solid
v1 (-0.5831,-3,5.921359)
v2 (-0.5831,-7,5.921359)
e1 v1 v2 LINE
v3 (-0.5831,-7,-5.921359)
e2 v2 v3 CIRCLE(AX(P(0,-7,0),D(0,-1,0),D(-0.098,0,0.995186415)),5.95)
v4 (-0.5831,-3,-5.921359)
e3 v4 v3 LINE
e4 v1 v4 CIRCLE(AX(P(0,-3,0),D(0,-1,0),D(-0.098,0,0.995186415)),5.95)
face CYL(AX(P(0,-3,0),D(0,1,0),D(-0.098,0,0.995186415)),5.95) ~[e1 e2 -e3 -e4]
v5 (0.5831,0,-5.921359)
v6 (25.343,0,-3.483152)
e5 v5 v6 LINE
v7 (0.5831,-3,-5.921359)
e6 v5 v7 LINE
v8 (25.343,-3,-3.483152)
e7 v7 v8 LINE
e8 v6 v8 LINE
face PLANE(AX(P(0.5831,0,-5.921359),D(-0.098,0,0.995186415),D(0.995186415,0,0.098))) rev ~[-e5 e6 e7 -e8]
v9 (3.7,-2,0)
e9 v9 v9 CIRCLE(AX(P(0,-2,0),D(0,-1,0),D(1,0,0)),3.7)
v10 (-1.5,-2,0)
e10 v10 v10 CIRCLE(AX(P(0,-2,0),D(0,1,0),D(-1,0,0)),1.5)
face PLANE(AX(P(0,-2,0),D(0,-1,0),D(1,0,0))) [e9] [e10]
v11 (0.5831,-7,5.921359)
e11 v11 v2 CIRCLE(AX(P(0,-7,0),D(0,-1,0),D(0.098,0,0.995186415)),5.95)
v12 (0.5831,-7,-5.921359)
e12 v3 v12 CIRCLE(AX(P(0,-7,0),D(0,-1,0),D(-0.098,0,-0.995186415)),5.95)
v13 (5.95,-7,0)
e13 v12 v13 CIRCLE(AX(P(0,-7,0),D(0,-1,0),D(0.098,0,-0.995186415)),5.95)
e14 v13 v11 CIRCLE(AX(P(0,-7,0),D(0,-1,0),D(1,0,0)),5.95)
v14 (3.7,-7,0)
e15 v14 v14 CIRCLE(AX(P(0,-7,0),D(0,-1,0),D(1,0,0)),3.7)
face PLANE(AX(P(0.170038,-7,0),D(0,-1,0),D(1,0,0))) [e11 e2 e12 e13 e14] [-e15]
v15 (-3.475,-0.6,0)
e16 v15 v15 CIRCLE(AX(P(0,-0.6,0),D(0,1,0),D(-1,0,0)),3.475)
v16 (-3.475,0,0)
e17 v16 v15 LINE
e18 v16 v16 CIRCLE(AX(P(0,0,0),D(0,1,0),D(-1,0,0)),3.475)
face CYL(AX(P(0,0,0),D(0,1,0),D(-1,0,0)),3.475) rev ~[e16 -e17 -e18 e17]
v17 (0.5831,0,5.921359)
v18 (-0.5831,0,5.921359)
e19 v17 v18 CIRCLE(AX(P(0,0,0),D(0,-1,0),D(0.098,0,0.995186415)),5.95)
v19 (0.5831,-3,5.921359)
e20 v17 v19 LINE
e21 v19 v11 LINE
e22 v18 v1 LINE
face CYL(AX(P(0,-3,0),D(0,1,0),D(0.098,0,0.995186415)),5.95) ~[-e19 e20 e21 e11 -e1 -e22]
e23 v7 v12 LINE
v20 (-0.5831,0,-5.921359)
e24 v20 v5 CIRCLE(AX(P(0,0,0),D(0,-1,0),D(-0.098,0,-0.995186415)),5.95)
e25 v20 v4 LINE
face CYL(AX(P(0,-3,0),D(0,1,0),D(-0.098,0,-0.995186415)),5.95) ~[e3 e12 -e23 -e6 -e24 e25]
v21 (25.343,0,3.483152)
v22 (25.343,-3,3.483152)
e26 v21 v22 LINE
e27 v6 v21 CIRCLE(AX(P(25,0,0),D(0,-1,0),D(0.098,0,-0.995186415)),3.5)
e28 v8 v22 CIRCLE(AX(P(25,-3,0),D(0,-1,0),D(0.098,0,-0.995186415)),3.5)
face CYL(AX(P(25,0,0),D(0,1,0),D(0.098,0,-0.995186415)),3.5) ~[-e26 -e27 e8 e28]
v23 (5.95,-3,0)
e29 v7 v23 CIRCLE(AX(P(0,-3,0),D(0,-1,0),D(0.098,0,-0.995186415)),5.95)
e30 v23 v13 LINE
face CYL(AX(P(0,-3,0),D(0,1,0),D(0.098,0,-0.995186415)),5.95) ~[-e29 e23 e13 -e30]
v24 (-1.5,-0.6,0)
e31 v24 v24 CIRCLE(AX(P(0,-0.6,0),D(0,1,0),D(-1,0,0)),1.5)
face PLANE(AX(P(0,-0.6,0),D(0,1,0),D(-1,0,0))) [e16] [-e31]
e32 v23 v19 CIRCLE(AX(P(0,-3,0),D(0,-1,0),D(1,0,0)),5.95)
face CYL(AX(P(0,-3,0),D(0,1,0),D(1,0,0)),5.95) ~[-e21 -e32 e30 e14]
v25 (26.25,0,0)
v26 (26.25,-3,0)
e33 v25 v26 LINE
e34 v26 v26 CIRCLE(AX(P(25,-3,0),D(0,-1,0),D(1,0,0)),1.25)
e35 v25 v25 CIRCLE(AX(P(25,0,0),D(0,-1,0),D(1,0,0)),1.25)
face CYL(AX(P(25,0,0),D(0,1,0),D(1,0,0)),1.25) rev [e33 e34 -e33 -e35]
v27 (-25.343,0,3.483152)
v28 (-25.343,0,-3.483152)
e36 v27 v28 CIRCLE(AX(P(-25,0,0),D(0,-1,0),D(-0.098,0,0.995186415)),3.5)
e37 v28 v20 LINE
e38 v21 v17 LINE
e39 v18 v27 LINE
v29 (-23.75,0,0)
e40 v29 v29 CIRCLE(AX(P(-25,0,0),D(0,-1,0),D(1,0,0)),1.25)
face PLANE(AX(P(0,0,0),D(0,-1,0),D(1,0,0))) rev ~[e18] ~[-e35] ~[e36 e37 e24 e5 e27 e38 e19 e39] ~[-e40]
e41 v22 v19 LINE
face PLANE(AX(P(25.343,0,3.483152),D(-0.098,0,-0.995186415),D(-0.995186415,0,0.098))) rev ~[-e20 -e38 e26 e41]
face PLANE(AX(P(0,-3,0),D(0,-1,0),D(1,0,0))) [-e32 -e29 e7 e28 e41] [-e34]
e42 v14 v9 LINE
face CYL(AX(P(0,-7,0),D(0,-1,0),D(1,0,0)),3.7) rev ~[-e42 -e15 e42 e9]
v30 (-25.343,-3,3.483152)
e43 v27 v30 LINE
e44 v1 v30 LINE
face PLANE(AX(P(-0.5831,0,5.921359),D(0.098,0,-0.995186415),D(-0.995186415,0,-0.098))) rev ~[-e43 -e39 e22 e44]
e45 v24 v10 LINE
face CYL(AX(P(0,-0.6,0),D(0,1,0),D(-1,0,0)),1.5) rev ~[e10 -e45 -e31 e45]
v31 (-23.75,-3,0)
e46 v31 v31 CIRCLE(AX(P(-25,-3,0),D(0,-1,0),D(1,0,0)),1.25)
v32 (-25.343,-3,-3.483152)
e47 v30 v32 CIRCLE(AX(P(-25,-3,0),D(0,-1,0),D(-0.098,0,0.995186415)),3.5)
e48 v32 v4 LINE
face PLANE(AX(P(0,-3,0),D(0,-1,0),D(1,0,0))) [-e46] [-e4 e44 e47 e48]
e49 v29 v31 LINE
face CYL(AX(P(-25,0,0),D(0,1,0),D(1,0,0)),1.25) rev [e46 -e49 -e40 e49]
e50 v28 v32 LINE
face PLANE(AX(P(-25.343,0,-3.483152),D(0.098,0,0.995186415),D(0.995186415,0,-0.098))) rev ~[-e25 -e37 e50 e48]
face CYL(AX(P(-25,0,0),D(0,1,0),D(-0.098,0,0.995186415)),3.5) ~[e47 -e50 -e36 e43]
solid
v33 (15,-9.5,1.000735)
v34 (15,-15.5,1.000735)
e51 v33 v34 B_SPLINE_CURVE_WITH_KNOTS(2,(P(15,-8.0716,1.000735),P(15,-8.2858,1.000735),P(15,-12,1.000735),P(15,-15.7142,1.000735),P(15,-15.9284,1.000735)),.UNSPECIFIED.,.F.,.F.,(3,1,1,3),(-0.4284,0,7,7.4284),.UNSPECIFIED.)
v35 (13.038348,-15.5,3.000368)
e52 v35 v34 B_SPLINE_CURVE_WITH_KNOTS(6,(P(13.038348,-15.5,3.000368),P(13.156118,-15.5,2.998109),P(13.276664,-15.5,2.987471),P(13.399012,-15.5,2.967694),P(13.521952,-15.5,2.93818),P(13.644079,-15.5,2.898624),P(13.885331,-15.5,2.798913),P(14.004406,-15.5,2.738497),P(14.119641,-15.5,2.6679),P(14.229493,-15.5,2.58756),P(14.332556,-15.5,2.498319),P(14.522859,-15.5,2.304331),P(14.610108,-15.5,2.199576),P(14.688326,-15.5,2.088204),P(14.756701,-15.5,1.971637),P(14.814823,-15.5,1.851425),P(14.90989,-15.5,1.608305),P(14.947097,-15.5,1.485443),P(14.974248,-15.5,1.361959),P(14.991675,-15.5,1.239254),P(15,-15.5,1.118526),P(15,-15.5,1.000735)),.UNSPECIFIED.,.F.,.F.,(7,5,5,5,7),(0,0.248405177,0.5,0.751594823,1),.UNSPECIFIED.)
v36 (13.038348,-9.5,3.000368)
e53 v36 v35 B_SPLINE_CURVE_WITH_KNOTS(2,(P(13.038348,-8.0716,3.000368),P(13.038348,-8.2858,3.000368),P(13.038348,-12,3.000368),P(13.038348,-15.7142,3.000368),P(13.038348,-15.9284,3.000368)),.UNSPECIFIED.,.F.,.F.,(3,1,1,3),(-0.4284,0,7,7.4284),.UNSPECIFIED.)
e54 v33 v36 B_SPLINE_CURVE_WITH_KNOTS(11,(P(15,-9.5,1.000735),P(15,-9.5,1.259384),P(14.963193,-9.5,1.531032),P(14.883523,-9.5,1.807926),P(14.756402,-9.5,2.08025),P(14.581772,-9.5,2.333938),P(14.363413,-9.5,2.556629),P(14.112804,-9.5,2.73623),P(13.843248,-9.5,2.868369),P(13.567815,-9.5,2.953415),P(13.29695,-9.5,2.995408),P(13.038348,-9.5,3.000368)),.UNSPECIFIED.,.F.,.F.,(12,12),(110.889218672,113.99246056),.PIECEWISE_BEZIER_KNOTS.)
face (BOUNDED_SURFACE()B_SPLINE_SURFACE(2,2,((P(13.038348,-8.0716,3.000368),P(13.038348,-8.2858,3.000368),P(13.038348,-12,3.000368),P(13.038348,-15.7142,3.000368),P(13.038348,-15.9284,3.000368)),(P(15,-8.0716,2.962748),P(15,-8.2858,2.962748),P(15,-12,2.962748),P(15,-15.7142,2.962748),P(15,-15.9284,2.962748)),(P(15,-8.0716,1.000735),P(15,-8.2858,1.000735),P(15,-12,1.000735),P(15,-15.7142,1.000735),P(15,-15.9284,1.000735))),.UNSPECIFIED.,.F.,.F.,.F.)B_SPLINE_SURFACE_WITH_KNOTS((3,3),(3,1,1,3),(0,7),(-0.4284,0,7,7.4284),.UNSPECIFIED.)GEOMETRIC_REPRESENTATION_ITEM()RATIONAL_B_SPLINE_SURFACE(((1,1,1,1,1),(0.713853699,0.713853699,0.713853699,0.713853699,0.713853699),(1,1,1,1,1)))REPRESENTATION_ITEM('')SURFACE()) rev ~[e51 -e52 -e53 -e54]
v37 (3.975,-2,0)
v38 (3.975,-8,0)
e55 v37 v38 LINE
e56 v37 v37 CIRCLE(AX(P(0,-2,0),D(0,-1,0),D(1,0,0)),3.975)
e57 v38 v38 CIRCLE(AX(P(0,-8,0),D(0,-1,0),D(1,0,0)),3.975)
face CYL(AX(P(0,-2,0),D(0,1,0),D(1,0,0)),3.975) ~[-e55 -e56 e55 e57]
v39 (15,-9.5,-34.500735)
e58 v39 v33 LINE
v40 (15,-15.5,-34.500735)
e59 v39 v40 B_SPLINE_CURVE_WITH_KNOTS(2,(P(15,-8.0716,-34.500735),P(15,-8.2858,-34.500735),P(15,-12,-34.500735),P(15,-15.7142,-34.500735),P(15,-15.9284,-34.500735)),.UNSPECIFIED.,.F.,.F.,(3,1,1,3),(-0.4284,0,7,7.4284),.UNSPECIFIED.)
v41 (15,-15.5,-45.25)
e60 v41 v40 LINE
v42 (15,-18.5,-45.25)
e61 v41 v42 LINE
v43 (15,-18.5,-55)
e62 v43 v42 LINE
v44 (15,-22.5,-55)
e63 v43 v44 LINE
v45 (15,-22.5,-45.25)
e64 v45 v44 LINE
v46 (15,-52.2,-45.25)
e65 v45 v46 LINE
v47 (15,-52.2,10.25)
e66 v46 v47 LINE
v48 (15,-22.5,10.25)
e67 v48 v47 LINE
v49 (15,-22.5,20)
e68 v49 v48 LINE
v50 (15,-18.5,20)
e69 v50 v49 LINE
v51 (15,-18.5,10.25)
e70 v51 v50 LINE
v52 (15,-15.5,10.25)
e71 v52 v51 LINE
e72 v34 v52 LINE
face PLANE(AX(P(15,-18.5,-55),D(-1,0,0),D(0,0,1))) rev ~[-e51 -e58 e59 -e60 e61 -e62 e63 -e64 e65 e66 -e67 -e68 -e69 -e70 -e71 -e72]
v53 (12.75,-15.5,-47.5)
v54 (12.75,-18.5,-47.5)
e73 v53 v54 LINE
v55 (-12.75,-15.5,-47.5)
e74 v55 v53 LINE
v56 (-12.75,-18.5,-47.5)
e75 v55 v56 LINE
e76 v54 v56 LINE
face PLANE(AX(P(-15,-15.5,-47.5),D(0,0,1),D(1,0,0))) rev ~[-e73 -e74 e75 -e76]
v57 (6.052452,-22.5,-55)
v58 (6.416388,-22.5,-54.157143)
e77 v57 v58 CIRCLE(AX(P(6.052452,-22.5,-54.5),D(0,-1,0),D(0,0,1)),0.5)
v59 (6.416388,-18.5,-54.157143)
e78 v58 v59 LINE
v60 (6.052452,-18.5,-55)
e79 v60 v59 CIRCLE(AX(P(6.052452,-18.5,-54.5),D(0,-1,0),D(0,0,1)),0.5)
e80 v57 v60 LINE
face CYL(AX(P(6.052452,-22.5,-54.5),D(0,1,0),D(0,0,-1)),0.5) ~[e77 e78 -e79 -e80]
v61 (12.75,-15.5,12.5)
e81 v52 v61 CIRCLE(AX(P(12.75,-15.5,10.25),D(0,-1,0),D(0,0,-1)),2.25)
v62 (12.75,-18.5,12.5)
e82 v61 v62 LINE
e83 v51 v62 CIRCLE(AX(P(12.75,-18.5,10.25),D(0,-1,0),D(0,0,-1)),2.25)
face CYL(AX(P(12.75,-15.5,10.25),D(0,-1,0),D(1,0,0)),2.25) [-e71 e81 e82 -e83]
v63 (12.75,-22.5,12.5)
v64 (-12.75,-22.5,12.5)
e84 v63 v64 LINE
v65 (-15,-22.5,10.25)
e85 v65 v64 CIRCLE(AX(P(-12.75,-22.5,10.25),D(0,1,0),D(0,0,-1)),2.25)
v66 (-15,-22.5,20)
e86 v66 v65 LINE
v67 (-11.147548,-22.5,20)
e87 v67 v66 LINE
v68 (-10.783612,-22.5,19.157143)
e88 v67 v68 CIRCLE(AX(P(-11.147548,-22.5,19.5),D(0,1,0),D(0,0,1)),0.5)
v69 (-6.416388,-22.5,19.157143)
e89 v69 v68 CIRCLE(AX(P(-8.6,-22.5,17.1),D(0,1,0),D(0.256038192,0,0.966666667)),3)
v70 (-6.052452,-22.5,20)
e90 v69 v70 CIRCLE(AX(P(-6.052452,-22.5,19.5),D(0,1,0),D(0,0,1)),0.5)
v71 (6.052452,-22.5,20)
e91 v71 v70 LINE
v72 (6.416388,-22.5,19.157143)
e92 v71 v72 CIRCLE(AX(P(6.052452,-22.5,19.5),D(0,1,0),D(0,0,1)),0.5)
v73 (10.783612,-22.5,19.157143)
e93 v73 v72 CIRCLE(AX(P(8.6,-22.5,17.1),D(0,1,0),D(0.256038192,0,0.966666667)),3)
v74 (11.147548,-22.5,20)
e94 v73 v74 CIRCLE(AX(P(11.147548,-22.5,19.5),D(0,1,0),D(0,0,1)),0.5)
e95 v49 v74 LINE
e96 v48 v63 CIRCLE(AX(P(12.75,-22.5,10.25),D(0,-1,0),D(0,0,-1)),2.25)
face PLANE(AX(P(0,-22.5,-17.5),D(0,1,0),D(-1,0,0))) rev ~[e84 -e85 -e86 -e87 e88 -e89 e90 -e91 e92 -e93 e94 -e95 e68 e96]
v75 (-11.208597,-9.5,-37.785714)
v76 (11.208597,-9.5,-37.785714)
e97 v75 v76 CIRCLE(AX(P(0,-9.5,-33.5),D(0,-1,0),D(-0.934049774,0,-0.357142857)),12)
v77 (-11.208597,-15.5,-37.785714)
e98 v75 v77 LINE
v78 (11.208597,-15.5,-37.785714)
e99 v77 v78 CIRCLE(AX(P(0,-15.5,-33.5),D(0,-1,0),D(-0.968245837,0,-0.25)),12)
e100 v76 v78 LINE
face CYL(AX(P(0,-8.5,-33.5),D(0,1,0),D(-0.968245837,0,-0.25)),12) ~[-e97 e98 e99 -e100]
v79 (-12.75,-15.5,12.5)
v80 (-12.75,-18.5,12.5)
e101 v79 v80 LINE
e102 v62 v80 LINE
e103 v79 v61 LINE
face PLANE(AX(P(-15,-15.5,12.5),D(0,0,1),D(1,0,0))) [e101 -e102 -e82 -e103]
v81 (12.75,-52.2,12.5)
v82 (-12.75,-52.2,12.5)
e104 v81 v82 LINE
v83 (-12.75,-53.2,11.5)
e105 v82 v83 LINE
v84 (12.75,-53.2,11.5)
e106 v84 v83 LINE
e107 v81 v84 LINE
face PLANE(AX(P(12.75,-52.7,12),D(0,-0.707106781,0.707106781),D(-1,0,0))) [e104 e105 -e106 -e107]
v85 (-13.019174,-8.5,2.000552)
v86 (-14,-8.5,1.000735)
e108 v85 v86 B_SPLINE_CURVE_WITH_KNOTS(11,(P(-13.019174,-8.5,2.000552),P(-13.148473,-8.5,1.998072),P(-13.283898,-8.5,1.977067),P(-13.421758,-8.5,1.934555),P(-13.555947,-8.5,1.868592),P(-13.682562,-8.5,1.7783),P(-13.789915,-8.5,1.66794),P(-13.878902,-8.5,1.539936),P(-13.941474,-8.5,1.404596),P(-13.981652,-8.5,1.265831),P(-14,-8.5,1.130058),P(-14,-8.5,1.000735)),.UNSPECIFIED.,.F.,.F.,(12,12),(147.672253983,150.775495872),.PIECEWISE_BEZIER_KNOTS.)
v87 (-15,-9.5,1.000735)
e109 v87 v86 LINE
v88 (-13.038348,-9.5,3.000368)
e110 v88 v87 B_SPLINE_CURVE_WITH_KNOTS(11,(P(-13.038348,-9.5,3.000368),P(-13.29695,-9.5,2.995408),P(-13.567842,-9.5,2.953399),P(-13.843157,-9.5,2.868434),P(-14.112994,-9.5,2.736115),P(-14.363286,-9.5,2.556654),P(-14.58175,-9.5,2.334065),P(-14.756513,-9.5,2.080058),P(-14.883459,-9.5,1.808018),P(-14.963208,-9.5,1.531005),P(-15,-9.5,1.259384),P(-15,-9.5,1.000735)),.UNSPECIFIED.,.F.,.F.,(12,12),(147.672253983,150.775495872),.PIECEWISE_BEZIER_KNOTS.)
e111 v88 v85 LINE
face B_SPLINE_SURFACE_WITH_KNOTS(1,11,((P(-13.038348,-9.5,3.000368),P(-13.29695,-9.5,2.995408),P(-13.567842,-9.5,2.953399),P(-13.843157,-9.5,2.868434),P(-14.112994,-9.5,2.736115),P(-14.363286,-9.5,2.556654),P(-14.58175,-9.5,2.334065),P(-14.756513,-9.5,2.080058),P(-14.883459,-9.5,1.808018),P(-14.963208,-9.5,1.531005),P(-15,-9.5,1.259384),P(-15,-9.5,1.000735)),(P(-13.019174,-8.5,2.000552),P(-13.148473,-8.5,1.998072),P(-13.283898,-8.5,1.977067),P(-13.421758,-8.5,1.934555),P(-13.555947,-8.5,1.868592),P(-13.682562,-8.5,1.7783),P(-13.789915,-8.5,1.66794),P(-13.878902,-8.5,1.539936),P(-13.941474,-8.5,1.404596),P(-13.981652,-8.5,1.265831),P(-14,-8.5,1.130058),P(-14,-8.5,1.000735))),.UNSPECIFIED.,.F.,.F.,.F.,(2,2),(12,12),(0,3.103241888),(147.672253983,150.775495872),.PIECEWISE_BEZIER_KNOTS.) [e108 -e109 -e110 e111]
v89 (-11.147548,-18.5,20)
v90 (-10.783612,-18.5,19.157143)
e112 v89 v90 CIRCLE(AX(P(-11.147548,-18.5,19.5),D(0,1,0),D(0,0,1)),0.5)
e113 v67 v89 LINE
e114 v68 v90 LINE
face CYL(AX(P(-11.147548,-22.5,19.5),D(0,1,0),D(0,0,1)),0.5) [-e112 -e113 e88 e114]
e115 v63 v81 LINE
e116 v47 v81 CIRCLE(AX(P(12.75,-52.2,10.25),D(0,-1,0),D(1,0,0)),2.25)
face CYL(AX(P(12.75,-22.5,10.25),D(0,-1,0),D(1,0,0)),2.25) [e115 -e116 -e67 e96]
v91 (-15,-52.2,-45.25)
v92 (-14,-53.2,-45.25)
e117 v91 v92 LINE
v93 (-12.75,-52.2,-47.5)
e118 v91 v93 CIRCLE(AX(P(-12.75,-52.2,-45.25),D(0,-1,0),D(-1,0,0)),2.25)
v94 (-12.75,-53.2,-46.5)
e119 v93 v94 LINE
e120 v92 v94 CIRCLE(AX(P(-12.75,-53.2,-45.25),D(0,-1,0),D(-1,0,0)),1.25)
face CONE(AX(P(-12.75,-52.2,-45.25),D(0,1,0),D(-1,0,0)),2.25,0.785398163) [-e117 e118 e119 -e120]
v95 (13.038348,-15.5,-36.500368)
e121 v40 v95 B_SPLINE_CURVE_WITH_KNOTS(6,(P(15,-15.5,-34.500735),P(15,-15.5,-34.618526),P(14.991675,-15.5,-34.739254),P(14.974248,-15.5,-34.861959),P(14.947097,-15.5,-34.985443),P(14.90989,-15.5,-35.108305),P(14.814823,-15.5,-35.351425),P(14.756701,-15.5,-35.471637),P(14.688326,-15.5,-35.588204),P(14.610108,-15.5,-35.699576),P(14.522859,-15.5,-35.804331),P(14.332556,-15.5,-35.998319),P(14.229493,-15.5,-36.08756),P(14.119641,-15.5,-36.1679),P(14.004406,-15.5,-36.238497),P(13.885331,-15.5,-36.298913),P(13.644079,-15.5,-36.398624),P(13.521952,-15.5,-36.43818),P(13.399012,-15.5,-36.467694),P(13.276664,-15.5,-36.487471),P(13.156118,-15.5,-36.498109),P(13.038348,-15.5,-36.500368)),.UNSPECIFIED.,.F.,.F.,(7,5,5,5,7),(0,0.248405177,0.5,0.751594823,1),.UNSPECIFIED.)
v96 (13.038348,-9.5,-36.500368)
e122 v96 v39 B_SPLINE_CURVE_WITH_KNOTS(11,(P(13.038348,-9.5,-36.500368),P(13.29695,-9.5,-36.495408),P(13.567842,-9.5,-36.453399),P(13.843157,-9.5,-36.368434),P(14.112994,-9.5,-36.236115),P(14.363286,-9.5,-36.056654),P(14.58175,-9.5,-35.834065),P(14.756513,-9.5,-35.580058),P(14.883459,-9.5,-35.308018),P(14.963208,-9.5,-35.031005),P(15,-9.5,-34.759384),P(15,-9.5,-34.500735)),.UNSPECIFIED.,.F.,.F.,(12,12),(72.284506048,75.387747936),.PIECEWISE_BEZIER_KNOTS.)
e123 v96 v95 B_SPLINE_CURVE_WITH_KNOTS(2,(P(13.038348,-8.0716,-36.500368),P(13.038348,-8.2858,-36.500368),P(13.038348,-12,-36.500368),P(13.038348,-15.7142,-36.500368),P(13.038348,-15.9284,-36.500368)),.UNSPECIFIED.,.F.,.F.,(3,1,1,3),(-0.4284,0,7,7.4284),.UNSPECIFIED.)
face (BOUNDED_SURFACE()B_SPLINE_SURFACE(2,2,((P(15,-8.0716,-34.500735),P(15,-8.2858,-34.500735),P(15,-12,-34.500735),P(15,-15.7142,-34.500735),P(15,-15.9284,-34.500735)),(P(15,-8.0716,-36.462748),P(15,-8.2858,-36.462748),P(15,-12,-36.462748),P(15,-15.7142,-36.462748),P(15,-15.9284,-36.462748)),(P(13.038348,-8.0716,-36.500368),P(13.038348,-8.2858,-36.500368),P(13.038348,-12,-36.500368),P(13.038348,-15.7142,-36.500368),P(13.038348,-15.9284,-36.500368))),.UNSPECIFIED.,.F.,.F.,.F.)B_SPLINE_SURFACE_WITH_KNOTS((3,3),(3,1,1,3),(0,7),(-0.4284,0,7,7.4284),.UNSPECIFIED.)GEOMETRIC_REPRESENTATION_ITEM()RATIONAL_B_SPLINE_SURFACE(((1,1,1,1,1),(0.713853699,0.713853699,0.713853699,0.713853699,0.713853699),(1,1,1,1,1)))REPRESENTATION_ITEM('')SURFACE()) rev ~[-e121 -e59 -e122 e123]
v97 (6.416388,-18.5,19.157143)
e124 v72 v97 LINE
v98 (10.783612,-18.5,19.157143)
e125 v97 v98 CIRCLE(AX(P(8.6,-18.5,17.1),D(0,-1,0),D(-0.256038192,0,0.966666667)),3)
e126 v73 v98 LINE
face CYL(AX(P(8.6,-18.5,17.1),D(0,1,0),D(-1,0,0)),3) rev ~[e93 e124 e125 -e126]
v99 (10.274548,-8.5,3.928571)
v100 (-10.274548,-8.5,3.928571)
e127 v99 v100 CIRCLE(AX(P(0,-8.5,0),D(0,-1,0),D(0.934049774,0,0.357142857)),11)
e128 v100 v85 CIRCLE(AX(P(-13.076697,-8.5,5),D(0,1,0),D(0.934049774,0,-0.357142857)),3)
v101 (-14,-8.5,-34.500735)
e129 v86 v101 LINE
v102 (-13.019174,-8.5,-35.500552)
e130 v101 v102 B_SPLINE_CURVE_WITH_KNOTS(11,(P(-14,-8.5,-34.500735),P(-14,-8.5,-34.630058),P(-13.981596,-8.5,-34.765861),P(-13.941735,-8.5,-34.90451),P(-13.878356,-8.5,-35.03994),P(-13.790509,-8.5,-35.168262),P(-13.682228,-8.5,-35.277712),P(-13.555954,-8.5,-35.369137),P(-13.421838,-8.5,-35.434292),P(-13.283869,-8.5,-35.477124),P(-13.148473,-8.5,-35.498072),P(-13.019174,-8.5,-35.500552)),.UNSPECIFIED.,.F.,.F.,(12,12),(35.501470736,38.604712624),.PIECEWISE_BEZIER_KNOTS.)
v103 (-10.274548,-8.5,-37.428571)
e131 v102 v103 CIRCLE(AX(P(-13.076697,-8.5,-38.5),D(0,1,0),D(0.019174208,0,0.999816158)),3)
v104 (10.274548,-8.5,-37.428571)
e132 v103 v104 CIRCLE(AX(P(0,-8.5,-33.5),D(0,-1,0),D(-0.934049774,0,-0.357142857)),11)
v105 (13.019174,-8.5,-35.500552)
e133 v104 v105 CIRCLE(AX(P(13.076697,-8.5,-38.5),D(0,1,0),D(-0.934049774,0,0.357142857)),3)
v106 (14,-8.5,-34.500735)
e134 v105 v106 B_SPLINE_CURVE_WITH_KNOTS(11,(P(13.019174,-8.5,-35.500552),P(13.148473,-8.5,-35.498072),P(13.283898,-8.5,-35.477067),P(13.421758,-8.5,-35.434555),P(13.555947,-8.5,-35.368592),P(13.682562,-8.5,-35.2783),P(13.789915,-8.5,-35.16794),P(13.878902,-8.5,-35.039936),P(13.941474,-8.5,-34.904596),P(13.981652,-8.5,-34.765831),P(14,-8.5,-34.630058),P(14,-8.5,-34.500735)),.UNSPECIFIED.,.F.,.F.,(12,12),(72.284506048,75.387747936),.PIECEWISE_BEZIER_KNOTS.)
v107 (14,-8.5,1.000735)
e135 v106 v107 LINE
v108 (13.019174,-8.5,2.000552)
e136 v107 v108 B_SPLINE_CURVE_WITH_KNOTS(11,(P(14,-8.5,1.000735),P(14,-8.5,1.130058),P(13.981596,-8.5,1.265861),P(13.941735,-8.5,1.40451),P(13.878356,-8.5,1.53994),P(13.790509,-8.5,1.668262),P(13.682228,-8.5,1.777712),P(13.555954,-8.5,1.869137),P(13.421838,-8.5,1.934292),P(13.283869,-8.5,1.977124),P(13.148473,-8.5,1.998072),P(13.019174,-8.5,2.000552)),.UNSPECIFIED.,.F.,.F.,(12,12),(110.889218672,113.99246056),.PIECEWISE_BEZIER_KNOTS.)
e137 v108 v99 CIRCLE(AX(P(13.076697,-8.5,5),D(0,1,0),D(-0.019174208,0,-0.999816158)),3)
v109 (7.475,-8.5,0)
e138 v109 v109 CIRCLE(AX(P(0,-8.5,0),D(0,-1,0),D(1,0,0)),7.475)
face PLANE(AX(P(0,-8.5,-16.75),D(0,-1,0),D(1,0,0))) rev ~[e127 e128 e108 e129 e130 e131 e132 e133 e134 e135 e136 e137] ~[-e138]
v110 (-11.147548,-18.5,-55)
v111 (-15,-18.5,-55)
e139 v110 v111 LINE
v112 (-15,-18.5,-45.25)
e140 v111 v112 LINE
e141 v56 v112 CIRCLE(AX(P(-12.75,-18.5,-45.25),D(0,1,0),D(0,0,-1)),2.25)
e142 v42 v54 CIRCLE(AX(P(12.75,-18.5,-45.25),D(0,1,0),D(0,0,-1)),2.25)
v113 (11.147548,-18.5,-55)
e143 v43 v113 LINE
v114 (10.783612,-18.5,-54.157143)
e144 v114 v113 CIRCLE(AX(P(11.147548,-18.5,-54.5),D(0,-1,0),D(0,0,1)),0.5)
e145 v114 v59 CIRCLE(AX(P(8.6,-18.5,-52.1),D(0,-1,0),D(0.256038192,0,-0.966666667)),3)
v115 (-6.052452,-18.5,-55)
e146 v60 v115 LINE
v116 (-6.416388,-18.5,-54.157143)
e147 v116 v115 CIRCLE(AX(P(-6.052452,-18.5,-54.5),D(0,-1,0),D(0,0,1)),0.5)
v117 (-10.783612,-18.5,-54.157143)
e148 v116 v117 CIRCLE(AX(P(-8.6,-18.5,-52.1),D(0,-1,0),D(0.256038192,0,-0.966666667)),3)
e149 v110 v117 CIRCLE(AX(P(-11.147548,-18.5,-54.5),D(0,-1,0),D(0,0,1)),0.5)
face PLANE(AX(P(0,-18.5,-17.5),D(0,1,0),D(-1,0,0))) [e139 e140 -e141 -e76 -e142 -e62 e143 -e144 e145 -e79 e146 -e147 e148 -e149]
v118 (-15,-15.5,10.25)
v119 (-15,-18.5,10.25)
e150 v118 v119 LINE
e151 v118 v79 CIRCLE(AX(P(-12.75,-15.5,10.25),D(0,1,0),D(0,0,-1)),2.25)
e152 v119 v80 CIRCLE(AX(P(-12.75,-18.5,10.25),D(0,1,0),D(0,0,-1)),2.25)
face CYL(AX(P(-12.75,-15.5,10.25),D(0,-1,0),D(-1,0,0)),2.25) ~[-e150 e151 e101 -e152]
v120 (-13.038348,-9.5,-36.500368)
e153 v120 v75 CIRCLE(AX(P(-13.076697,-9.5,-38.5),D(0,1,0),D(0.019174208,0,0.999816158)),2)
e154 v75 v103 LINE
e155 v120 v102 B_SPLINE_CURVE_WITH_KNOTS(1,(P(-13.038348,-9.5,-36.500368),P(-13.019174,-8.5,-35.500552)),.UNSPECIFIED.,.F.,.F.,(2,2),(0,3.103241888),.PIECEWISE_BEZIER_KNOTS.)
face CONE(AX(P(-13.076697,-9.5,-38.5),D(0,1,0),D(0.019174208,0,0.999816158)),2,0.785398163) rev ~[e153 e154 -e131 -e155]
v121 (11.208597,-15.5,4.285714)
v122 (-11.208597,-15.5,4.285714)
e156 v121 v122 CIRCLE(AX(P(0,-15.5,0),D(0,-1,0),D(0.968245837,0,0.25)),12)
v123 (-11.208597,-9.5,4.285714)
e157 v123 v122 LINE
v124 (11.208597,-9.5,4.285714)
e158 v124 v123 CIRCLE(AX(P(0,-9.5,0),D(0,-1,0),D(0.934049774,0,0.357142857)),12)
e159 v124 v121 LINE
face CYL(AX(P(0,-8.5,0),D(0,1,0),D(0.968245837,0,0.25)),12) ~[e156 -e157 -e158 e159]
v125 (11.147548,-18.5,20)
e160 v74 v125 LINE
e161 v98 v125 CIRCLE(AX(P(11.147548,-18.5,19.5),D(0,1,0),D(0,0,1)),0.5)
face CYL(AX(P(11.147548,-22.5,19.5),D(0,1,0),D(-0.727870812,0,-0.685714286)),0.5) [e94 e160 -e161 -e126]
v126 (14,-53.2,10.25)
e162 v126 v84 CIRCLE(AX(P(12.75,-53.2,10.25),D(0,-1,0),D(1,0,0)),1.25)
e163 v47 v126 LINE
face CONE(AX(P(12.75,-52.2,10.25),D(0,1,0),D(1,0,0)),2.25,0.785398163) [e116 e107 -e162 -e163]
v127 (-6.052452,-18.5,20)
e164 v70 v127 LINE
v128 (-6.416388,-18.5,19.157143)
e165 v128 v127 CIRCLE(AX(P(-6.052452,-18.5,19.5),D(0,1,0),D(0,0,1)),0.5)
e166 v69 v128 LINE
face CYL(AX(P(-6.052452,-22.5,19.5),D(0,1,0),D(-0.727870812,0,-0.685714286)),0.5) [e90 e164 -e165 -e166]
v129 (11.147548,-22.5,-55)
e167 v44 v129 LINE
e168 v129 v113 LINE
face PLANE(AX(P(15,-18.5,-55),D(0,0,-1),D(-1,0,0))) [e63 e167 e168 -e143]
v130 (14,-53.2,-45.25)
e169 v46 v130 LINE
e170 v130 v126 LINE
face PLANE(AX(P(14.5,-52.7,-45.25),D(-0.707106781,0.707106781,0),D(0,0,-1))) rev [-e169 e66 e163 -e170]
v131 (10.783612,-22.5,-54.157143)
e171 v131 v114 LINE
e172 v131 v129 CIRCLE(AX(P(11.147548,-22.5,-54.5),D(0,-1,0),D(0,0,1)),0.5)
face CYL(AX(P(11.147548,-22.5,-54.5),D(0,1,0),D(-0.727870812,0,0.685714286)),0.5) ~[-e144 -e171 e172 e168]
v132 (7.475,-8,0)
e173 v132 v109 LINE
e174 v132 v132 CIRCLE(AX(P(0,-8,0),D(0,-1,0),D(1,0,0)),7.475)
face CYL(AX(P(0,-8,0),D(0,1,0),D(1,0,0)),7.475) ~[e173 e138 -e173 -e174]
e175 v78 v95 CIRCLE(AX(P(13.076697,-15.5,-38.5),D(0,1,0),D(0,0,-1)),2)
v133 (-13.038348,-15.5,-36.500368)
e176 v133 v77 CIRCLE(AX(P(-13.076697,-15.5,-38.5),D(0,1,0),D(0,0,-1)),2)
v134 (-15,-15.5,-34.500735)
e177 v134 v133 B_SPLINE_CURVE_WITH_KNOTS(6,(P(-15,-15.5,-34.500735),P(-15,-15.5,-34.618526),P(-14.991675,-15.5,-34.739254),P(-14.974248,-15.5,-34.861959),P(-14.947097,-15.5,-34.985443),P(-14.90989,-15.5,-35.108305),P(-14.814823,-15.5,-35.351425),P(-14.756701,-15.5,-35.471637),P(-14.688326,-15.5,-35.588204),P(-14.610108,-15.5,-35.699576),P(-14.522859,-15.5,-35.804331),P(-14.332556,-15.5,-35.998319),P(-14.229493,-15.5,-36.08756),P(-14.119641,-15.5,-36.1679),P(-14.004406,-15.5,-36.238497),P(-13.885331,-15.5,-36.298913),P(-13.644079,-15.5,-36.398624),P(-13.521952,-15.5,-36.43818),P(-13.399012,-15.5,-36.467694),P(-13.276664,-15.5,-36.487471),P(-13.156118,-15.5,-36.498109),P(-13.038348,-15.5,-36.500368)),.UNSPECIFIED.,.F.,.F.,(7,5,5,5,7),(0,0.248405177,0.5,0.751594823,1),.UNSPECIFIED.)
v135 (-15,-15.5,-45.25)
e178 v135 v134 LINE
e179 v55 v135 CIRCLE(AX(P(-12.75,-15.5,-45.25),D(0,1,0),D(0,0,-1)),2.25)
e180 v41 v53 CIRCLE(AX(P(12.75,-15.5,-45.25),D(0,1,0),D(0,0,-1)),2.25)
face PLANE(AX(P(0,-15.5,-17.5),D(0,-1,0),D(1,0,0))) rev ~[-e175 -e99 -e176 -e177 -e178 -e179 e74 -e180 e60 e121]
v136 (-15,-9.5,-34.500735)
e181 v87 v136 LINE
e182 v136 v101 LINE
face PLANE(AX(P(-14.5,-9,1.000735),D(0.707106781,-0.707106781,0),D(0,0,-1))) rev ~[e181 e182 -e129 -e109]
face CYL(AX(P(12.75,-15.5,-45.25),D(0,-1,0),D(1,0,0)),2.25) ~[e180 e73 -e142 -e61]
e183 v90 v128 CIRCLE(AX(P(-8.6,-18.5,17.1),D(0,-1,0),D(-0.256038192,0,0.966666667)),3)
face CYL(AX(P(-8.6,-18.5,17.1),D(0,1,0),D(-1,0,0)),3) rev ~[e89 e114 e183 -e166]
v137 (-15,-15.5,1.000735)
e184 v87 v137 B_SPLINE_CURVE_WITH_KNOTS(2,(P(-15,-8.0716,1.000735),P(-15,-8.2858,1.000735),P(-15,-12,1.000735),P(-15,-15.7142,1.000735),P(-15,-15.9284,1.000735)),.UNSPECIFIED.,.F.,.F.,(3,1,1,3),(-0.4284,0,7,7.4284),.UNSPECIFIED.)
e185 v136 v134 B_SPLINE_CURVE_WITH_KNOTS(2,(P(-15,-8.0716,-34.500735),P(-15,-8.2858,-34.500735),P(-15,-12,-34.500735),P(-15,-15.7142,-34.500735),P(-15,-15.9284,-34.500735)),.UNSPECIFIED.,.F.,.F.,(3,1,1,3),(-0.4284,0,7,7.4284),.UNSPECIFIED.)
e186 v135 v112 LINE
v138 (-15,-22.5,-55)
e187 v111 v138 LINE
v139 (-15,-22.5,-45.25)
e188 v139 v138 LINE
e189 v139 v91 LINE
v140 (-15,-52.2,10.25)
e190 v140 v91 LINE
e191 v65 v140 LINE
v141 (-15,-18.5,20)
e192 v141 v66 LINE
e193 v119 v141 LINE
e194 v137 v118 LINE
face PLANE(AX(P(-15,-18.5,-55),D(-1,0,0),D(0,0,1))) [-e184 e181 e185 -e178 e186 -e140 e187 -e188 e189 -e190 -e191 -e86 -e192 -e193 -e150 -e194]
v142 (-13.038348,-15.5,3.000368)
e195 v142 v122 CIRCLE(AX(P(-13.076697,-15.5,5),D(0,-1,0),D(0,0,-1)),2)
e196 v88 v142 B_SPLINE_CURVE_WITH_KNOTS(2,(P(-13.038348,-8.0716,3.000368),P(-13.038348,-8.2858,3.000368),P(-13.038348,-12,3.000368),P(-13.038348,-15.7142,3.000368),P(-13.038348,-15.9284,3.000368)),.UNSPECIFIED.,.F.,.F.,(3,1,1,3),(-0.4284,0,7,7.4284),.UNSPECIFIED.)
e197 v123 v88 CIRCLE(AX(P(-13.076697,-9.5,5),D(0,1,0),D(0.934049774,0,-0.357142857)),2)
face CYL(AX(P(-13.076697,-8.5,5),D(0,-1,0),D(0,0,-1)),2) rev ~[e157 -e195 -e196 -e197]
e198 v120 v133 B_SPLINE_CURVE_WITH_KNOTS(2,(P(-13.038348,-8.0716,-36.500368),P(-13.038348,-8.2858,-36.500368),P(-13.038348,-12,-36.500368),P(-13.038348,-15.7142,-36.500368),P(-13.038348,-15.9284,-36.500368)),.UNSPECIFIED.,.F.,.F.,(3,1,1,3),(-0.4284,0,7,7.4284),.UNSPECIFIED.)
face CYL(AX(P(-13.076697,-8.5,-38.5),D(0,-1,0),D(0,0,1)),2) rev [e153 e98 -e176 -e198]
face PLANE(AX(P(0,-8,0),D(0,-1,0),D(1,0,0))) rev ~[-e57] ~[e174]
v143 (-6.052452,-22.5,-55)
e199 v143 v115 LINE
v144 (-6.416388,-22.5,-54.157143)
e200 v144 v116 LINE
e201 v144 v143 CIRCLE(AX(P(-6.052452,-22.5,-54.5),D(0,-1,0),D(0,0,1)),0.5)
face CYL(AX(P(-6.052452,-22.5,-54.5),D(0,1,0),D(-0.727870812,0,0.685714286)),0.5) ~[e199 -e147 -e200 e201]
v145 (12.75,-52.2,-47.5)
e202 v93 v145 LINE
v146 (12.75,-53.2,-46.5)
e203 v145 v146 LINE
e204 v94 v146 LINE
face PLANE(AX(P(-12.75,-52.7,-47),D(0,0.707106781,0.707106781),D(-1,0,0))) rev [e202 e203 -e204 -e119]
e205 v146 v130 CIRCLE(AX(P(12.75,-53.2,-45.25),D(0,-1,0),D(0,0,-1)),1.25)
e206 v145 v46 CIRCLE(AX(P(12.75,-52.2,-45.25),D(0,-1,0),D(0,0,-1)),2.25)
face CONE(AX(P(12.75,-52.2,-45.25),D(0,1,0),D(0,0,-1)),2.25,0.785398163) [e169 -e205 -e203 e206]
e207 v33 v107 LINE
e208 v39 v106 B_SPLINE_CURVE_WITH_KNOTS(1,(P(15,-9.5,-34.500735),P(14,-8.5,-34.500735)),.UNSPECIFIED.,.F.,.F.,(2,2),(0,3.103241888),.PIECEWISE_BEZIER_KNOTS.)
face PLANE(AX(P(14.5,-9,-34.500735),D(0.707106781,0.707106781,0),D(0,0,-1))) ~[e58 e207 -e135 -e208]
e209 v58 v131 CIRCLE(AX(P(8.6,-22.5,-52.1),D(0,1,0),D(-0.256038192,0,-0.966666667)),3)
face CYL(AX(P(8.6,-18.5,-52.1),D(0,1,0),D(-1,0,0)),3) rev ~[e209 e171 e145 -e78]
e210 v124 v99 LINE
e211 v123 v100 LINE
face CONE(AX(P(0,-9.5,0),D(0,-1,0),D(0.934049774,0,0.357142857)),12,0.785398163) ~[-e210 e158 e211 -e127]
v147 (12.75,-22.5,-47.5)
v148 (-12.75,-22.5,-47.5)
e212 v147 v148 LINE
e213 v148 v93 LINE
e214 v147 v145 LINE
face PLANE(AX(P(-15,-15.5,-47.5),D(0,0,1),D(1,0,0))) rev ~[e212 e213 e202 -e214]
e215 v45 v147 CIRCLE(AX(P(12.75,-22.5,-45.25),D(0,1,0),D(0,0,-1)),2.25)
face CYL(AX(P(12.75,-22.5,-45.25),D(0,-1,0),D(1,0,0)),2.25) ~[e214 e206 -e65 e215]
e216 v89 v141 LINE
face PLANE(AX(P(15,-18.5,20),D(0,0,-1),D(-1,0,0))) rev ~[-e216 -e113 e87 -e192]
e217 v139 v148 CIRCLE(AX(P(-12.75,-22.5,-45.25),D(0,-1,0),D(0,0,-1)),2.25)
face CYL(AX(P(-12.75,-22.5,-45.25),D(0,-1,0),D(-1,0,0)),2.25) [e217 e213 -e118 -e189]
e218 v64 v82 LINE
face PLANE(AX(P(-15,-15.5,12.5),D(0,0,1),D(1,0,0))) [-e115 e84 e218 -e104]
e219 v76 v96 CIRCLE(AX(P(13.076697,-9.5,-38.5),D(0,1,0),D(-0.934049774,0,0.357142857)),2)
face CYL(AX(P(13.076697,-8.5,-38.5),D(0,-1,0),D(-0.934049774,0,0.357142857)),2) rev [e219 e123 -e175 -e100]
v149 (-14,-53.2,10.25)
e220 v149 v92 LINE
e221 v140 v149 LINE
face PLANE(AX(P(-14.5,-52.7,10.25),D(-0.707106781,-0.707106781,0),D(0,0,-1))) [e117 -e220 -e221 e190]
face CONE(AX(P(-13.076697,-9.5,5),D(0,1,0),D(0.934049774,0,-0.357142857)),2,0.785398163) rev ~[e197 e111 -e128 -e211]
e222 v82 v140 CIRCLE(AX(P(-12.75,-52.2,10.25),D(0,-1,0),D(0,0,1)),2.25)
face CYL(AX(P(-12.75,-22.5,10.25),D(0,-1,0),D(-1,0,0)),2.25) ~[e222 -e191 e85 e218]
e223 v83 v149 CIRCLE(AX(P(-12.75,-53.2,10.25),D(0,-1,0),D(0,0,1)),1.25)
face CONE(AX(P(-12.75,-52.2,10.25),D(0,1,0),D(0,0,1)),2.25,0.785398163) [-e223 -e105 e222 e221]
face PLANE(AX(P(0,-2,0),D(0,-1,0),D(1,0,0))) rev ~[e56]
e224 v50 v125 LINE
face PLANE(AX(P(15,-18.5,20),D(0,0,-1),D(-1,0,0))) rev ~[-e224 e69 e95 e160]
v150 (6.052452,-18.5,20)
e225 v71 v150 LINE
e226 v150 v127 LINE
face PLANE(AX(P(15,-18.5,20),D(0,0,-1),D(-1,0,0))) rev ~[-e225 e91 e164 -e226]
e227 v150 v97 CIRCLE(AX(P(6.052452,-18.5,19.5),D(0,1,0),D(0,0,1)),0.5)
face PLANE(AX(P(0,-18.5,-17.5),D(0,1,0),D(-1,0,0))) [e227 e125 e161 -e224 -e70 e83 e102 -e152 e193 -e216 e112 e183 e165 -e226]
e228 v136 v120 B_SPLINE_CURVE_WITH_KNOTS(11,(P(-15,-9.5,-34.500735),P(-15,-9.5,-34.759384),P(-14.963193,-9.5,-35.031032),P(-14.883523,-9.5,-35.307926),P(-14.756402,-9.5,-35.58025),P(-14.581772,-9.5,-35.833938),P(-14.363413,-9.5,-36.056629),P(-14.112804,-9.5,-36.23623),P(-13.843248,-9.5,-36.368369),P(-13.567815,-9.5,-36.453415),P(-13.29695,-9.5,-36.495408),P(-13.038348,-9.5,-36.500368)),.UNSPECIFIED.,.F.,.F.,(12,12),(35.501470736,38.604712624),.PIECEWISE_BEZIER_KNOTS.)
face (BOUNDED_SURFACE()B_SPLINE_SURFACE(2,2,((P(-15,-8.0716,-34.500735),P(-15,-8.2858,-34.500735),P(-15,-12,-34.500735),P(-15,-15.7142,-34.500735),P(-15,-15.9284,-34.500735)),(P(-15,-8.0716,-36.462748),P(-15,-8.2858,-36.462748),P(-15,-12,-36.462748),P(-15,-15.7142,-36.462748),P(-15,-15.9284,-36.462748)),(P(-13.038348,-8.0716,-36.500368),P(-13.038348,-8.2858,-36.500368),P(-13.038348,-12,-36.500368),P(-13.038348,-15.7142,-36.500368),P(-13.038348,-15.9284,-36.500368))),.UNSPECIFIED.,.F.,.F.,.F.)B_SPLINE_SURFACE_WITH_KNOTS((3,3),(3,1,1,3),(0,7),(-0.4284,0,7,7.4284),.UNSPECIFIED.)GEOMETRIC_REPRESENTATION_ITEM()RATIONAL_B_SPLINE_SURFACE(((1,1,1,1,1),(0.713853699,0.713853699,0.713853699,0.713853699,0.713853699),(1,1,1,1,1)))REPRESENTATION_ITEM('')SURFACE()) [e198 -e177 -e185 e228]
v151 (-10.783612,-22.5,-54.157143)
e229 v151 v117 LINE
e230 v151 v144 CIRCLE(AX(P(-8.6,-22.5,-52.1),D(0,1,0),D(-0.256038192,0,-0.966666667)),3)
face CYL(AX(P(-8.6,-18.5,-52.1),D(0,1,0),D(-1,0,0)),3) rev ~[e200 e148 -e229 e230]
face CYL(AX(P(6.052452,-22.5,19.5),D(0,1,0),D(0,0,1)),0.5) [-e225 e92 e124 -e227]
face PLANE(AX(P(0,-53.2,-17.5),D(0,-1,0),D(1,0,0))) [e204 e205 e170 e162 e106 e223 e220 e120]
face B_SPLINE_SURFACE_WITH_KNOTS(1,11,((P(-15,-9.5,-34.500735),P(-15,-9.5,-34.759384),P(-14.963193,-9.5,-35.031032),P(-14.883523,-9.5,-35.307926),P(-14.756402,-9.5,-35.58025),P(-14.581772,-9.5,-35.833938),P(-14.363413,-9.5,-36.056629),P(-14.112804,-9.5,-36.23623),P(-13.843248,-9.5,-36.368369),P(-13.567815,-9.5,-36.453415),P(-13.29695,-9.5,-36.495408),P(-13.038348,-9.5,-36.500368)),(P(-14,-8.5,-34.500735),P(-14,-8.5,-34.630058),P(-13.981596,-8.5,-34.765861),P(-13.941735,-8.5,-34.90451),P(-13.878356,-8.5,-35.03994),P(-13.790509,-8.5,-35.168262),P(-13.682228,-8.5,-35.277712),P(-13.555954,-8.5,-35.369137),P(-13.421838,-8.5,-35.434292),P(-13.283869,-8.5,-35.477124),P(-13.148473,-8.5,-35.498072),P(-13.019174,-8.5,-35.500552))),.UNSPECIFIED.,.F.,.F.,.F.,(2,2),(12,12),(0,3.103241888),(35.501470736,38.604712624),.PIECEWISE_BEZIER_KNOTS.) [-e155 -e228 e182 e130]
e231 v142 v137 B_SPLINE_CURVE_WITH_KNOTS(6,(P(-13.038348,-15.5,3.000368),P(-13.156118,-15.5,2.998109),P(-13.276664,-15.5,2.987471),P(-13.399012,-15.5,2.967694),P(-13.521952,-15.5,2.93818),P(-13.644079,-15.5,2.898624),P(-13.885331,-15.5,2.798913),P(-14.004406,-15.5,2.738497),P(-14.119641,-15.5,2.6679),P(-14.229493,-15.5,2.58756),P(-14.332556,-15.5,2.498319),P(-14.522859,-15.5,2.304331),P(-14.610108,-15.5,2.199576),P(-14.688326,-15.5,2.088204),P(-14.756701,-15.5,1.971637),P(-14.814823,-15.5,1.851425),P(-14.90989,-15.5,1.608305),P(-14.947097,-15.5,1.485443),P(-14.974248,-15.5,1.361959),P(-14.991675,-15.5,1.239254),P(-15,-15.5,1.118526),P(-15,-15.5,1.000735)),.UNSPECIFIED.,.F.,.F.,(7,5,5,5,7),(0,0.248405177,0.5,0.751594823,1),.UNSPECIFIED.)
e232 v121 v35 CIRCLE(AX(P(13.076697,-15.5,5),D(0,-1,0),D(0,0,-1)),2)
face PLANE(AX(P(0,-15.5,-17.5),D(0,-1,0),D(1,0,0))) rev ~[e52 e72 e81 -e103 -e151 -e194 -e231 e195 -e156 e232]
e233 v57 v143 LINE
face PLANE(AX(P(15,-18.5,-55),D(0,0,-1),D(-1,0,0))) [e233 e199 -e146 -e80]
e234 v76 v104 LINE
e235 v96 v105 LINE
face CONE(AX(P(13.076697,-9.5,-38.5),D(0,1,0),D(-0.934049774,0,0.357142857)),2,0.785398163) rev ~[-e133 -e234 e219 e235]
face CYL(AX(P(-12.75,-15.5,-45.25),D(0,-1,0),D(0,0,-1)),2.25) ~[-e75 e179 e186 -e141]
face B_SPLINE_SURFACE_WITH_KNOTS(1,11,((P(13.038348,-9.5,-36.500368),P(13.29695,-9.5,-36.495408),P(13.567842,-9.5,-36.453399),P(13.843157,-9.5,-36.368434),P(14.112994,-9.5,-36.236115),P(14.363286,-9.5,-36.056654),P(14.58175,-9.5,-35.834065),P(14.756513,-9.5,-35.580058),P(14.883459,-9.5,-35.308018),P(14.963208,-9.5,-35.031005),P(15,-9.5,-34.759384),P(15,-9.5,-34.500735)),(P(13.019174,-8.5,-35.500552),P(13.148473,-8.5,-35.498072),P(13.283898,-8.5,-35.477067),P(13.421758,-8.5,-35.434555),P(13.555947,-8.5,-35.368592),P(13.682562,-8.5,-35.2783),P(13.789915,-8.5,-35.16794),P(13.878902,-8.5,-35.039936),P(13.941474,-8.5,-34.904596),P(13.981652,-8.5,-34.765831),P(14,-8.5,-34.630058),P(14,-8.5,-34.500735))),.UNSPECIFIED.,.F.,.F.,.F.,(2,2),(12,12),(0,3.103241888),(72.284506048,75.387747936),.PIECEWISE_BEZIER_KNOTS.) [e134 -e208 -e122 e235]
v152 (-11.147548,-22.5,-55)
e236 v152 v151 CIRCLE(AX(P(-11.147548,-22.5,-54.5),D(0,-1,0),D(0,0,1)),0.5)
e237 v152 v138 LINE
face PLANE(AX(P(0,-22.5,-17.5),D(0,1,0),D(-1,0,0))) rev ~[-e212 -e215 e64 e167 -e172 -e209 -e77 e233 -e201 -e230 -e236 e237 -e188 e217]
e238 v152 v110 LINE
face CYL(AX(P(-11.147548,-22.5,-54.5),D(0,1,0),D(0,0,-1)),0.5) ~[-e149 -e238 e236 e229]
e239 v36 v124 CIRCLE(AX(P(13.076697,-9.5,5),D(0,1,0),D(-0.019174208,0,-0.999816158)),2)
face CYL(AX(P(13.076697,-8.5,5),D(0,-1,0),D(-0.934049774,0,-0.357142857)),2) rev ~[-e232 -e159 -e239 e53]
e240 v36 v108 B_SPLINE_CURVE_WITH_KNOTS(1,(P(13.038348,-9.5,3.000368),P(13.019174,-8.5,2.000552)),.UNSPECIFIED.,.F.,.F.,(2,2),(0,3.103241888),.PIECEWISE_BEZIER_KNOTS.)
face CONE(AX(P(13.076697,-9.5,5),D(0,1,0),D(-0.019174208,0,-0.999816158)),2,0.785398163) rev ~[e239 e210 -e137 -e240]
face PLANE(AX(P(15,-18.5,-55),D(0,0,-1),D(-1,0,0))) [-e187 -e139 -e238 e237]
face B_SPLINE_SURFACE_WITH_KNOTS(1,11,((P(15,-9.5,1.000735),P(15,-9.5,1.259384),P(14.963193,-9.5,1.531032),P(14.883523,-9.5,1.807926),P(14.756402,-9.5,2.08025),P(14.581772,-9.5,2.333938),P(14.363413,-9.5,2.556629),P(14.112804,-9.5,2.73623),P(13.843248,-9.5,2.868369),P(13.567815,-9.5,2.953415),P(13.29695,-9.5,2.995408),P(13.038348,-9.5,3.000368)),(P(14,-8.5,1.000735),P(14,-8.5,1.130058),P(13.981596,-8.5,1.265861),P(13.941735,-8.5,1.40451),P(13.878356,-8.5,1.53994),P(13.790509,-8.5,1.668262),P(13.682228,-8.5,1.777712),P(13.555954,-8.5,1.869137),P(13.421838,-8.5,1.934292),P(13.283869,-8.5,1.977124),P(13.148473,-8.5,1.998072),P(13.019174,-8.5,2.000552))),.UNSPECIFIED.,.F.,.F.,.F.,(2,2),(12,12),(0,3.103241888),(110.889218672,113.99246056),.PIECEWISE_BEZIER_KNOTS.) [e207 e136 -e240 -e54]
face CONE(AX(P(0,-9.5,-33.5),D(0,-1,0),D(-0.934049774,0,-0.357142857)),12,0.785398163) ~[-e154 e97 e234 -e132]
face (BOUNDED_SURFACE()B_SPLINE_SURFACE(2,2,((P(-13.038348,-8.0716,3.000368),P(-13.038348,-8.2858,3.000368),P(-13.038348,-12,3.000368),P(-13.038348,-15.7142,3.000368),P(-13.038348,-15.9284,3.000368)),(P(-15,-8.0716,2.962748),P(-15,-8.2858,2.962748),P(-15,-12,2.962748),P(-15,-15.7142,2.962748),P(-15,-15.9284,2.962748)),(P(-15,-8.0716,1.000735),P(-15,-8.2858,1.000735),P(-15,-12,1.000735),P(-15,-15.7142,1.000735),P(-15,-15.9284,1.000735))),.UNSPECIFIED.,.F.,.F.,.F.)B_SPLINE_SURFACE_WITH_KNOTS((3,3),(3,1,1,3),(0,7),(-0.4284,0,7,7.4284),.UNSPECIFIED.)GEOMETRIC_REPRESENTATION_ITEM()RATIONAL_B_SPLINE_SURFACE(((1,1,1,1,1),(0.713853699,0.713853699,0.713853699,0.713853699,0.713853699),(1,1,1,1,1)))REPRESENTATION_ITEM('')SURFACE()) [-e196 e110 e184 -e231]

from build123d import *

# Parameters (mm, degrees)
F0_R      = 1.25
F1_DEPTH  = 3
F3_DEPTH  = 4
F4_R      = 3.475
F5_DEPTH  = 0.6
F6_R      = 1.5
F7_DEPTH  = 25
F8_R      = 3.7
F9_DEPTH  = 5
F10_R     = 3.975
F11_DEPTH = 6
F12_R     = 7.475
F13_DEPTH = 0.5
F15_DEPTH = 7
F16_R     = 2
F17_R     = 2
F18_W     = 30
F18_H     = 60
F19_DEPTH = 37.7
F21_W     = 30
F21_H     = 75
F22_DEPTH = 4
F23_R     = 2.25
F24_R     = 2.25
F25_SIZE  = 1
F26_R     = 3
F27_DEPTH = 25
F28_R     = 0.5
F29_SIZE  = 1


with BuildPart() as f1:
    # F0 (on Front) → F1 (new body)
    with BuildSketch(Plane.XZ):
        with BuildLine():
            Line((-25.343, -3.4831524514), (-0.5831, -5.9213591675))
            ThreePointArc((-0.5831, -5.9213591675), (0, -5.95), (0.5831, -5.9213591675))
            Line((0.5831, -5.9213591675), (25.343, -3.4831524514))
            ThreePointArc((25.343, -3.4831524514), (28.5, 0), (25.343, 3.4831524514))
            Line((25.343, 3.4831524514), (0.5831, 5.9213591675))
            ThreePointArc((0.5831, 5.9213591675), (0, 5.95), (-0.5831, 5.9213591675))
            Line((-0.5831, 5.9213591675), (-25.343, 3.4831524514))
            ThreePointArc((-25.343, 3.4831524514), (-28.5, 0), (-25.343, -3.4831524514))
        make_face()
        with Locations((-25, 0)):
            Circle(F0_R, mode=Mode.SUBTRACT)
        with Locations((25, 0)):
            Circle(F0_R, mode=Mode.SUBTRACT)
    extrude(amount=F1_DEPTH)

    # F2 (on face) → F3 (join)
    with BuildSketch(Plane.XZ.offset(3)):
        with BuildLine():
            ThreePointArc((0.5831, -5.9213591675), (4.4086247856, -3.9958137469), (5.95, 0))
            ThreePointArc((5.95, 0), (4.4086247856, 3.9958137469), (0.5831, 5.9213591675))
            ThreePointArc((0.5831, 5.9213591675), (0, 5.95), (-0.5831, 5.9213591675))
            ThreePointArc((-0.5831, 5.9213591675), (-5.95, 0), (-0.5831, -5.9213591675))
            ThreePointArc((-0.5831, -5.9213591675), (0, -5.95), (0.5831, -5.9213591675))
        make_face()
    extrude(amount=F3_DEPTH)

    # F4 (on face) → F5 (cut)
    with BuildSketch(Plane(origin=(0, 0, 0), x_dir=(-1, 0, 0), z_dir=(0, 1, 0))):
        Circle(F4_R)
    extrude(amount=-F5_DEPTH, mode=Mode.SUBTRACT)

    # F6 (on face) → F7 (cut)
    with BuildSketch(Plane(origin=(0, -0.6, 0), x_dir=(-1, 0, 0), z_dir=(0, 1, 0))):
        Circle(F6_R)
    extrude(amount=-F7_DEPTH, mode=Mode.SUBTRACT)

    # F8 (on face) → F9 (cut)
    with BuildSketch(Plane.XZ.offset(7)):
        Circle(F8_R)
    extrude(amount=-F9_DEPTH, mode=Mode.SUBTRACT)


with BuildPart() as f11:
    # F10 (on face) → F11 (new body)
    with BuildSketch(Plane.XZ.offset(2)):
        Circle(F10_R)
    extrude(amount=F11_DEPTH)

    # F12 (on face) → F13 (join)
    with BuildSketch(Plane.XZ.offset(8)):
        Circle(F12_R)
    extrude(amount=F13_DEPTH)

    # F14 (on face) → F15 (join)
    with BuildSketch(Plane.XZ.offset(8.5)):
        with BuildLine():
            Line((-11.6189500386, 3), (-15, 3))
            Line((-15, 3), (-15, -36.5))
            Line((-15, -36.5), (-11.6189500386, -36.5))
            ThreePointArc((-11.6189500386, -36.5), (0, -45.5), (11.6189500386, -36.5))
            Line((11.6189500386, -36.5), (15, -36.5))
            Line((15, -36.5), (15, 3))
            Line((15, 3), (11.6189500386, 3))
            ThreePointArc((11.6189500386, 3), (0, 12), (-11.6189500386, 3))
        make_face()
    extrude(amount=F15_DEPTH)

    # F16
    f16_edges = [f11.edges().sort_by_distance(p)[0] for p in [
        (-11.61895, -12, 3),
        (11.61895, -12, 3),
        (11.61895, -12, -36.5),
        (-11.61895, -12, -36.5),
    ]]
    fillet(f16_edges, radius=F16_R)

    # F17
    f17_edges = [f11.edges().sort_by_distance(p)[0] for p in [
        (15, -12, 3),
        (-15, -12, 3),
        (15, -12, -36.5),
        (-15, -12, -36.5),
    ]]
    fillet(f17_edges, radius=F17_R)

    # F18 (on face) → F19 (join)
    with BuildSketch(Plane.XZ.offset(15.5)):
        with Locations((0, -17.5)):
            Rectangle(F18_W, F18_H)
    extrude(amount=F19_DEPTH)

    # F21 (on offset) → F22 (join)
    with BuildSketch(Plane(origin=(0, -18.5, 0), x_dir=(-1, 0, 0), z_dir=(0, 1, 0))):
        with Locations((0, -17.5)):
            Rectangle(F21_W, F21_H)
    extrude(amount=-F22_DEPTH)

    # F23
    f23_edges = [f11.edges().sort_by_distance(p)[0] for p in [
        (15, -17, 12.5),
        (-15, -17, 12.5),
        (15, -17, -47.5),
        (-15, -17, -47.5),
    ]]
    fillet(f23_edges, radius=F23_R)

    # F24
    f24_edges = [f11.edges().sort_by_distance(p)[0] for p in [
        (15, -37.85, 12.5),
        (15, -37.85, -47.5),
        (-15, -37.85, -47.5),
        (-15, -37.85, 12.5),
    ]]
    fillet(f24_edges, radius=F24_R)

    # F25
    f25_edges = [f11.edges().sort_by_distance(p)[0] for p in [
        (0, -53.2, -47.5),
        (-14.34099, -53.2, -46.84099),
        (14.34099, -53.2, -46.84099),
        (-15, -53.2, -17.5),
        (15, -53.2, -17.5),
        (-14.34099, -53.2, 11.84099),
        (14.34099, -53.2, 11.84099),
        (0, -53.2, 12.5),
    ]]
    chamfer(f25_edges, length=F25_SIZE)

    # F26 (on face) → F27 (cut)
    with BuildSketch(Plane(origin=(0, -18.5, 0), x_dir=(-1, 0, 0), z_dir=(0, 1, 0))):
        with Locations((-8.6, -52.1)):
            Circle(F26_R)
        with Locations((-8.6, 17.1)):
            Circle(F26_R)
        with Locations((8.6, -52.1)):
            Circle(F26_R)
        with Locations((8.6, 17.1)):
            Circle(F26_R)
    extrude(amount=-F27_DEPTH, mode=Mode.SUBTRACT)

    # F28
    f28_edges = [f11.edges().sort_by_distance(p)[0] for p in [
        (9.368115, -20.5, -55),
        (7.831885, -20.5, -55),
        (-7.831885, -20.5, -55),
        (-9.368115, -20.5, -55),
        (9.368115, -20.5, 20),
        (7.831885, -20.5, 20),
        (-7.831885, -20.5, 20),
        (-9.368115, -20.5, 20),
    ]]
    fillet(f28_edges, radius=F28_R)

    # F29
    f29_edges = [f11.edges().sort_by_distance(p)[0] for p in [
        (-15, -8.5, -16.75),
    ]]
    chamfer(f29_edges, length=F29_SIZE)


solid = Compound([f1.part, f11.part])
